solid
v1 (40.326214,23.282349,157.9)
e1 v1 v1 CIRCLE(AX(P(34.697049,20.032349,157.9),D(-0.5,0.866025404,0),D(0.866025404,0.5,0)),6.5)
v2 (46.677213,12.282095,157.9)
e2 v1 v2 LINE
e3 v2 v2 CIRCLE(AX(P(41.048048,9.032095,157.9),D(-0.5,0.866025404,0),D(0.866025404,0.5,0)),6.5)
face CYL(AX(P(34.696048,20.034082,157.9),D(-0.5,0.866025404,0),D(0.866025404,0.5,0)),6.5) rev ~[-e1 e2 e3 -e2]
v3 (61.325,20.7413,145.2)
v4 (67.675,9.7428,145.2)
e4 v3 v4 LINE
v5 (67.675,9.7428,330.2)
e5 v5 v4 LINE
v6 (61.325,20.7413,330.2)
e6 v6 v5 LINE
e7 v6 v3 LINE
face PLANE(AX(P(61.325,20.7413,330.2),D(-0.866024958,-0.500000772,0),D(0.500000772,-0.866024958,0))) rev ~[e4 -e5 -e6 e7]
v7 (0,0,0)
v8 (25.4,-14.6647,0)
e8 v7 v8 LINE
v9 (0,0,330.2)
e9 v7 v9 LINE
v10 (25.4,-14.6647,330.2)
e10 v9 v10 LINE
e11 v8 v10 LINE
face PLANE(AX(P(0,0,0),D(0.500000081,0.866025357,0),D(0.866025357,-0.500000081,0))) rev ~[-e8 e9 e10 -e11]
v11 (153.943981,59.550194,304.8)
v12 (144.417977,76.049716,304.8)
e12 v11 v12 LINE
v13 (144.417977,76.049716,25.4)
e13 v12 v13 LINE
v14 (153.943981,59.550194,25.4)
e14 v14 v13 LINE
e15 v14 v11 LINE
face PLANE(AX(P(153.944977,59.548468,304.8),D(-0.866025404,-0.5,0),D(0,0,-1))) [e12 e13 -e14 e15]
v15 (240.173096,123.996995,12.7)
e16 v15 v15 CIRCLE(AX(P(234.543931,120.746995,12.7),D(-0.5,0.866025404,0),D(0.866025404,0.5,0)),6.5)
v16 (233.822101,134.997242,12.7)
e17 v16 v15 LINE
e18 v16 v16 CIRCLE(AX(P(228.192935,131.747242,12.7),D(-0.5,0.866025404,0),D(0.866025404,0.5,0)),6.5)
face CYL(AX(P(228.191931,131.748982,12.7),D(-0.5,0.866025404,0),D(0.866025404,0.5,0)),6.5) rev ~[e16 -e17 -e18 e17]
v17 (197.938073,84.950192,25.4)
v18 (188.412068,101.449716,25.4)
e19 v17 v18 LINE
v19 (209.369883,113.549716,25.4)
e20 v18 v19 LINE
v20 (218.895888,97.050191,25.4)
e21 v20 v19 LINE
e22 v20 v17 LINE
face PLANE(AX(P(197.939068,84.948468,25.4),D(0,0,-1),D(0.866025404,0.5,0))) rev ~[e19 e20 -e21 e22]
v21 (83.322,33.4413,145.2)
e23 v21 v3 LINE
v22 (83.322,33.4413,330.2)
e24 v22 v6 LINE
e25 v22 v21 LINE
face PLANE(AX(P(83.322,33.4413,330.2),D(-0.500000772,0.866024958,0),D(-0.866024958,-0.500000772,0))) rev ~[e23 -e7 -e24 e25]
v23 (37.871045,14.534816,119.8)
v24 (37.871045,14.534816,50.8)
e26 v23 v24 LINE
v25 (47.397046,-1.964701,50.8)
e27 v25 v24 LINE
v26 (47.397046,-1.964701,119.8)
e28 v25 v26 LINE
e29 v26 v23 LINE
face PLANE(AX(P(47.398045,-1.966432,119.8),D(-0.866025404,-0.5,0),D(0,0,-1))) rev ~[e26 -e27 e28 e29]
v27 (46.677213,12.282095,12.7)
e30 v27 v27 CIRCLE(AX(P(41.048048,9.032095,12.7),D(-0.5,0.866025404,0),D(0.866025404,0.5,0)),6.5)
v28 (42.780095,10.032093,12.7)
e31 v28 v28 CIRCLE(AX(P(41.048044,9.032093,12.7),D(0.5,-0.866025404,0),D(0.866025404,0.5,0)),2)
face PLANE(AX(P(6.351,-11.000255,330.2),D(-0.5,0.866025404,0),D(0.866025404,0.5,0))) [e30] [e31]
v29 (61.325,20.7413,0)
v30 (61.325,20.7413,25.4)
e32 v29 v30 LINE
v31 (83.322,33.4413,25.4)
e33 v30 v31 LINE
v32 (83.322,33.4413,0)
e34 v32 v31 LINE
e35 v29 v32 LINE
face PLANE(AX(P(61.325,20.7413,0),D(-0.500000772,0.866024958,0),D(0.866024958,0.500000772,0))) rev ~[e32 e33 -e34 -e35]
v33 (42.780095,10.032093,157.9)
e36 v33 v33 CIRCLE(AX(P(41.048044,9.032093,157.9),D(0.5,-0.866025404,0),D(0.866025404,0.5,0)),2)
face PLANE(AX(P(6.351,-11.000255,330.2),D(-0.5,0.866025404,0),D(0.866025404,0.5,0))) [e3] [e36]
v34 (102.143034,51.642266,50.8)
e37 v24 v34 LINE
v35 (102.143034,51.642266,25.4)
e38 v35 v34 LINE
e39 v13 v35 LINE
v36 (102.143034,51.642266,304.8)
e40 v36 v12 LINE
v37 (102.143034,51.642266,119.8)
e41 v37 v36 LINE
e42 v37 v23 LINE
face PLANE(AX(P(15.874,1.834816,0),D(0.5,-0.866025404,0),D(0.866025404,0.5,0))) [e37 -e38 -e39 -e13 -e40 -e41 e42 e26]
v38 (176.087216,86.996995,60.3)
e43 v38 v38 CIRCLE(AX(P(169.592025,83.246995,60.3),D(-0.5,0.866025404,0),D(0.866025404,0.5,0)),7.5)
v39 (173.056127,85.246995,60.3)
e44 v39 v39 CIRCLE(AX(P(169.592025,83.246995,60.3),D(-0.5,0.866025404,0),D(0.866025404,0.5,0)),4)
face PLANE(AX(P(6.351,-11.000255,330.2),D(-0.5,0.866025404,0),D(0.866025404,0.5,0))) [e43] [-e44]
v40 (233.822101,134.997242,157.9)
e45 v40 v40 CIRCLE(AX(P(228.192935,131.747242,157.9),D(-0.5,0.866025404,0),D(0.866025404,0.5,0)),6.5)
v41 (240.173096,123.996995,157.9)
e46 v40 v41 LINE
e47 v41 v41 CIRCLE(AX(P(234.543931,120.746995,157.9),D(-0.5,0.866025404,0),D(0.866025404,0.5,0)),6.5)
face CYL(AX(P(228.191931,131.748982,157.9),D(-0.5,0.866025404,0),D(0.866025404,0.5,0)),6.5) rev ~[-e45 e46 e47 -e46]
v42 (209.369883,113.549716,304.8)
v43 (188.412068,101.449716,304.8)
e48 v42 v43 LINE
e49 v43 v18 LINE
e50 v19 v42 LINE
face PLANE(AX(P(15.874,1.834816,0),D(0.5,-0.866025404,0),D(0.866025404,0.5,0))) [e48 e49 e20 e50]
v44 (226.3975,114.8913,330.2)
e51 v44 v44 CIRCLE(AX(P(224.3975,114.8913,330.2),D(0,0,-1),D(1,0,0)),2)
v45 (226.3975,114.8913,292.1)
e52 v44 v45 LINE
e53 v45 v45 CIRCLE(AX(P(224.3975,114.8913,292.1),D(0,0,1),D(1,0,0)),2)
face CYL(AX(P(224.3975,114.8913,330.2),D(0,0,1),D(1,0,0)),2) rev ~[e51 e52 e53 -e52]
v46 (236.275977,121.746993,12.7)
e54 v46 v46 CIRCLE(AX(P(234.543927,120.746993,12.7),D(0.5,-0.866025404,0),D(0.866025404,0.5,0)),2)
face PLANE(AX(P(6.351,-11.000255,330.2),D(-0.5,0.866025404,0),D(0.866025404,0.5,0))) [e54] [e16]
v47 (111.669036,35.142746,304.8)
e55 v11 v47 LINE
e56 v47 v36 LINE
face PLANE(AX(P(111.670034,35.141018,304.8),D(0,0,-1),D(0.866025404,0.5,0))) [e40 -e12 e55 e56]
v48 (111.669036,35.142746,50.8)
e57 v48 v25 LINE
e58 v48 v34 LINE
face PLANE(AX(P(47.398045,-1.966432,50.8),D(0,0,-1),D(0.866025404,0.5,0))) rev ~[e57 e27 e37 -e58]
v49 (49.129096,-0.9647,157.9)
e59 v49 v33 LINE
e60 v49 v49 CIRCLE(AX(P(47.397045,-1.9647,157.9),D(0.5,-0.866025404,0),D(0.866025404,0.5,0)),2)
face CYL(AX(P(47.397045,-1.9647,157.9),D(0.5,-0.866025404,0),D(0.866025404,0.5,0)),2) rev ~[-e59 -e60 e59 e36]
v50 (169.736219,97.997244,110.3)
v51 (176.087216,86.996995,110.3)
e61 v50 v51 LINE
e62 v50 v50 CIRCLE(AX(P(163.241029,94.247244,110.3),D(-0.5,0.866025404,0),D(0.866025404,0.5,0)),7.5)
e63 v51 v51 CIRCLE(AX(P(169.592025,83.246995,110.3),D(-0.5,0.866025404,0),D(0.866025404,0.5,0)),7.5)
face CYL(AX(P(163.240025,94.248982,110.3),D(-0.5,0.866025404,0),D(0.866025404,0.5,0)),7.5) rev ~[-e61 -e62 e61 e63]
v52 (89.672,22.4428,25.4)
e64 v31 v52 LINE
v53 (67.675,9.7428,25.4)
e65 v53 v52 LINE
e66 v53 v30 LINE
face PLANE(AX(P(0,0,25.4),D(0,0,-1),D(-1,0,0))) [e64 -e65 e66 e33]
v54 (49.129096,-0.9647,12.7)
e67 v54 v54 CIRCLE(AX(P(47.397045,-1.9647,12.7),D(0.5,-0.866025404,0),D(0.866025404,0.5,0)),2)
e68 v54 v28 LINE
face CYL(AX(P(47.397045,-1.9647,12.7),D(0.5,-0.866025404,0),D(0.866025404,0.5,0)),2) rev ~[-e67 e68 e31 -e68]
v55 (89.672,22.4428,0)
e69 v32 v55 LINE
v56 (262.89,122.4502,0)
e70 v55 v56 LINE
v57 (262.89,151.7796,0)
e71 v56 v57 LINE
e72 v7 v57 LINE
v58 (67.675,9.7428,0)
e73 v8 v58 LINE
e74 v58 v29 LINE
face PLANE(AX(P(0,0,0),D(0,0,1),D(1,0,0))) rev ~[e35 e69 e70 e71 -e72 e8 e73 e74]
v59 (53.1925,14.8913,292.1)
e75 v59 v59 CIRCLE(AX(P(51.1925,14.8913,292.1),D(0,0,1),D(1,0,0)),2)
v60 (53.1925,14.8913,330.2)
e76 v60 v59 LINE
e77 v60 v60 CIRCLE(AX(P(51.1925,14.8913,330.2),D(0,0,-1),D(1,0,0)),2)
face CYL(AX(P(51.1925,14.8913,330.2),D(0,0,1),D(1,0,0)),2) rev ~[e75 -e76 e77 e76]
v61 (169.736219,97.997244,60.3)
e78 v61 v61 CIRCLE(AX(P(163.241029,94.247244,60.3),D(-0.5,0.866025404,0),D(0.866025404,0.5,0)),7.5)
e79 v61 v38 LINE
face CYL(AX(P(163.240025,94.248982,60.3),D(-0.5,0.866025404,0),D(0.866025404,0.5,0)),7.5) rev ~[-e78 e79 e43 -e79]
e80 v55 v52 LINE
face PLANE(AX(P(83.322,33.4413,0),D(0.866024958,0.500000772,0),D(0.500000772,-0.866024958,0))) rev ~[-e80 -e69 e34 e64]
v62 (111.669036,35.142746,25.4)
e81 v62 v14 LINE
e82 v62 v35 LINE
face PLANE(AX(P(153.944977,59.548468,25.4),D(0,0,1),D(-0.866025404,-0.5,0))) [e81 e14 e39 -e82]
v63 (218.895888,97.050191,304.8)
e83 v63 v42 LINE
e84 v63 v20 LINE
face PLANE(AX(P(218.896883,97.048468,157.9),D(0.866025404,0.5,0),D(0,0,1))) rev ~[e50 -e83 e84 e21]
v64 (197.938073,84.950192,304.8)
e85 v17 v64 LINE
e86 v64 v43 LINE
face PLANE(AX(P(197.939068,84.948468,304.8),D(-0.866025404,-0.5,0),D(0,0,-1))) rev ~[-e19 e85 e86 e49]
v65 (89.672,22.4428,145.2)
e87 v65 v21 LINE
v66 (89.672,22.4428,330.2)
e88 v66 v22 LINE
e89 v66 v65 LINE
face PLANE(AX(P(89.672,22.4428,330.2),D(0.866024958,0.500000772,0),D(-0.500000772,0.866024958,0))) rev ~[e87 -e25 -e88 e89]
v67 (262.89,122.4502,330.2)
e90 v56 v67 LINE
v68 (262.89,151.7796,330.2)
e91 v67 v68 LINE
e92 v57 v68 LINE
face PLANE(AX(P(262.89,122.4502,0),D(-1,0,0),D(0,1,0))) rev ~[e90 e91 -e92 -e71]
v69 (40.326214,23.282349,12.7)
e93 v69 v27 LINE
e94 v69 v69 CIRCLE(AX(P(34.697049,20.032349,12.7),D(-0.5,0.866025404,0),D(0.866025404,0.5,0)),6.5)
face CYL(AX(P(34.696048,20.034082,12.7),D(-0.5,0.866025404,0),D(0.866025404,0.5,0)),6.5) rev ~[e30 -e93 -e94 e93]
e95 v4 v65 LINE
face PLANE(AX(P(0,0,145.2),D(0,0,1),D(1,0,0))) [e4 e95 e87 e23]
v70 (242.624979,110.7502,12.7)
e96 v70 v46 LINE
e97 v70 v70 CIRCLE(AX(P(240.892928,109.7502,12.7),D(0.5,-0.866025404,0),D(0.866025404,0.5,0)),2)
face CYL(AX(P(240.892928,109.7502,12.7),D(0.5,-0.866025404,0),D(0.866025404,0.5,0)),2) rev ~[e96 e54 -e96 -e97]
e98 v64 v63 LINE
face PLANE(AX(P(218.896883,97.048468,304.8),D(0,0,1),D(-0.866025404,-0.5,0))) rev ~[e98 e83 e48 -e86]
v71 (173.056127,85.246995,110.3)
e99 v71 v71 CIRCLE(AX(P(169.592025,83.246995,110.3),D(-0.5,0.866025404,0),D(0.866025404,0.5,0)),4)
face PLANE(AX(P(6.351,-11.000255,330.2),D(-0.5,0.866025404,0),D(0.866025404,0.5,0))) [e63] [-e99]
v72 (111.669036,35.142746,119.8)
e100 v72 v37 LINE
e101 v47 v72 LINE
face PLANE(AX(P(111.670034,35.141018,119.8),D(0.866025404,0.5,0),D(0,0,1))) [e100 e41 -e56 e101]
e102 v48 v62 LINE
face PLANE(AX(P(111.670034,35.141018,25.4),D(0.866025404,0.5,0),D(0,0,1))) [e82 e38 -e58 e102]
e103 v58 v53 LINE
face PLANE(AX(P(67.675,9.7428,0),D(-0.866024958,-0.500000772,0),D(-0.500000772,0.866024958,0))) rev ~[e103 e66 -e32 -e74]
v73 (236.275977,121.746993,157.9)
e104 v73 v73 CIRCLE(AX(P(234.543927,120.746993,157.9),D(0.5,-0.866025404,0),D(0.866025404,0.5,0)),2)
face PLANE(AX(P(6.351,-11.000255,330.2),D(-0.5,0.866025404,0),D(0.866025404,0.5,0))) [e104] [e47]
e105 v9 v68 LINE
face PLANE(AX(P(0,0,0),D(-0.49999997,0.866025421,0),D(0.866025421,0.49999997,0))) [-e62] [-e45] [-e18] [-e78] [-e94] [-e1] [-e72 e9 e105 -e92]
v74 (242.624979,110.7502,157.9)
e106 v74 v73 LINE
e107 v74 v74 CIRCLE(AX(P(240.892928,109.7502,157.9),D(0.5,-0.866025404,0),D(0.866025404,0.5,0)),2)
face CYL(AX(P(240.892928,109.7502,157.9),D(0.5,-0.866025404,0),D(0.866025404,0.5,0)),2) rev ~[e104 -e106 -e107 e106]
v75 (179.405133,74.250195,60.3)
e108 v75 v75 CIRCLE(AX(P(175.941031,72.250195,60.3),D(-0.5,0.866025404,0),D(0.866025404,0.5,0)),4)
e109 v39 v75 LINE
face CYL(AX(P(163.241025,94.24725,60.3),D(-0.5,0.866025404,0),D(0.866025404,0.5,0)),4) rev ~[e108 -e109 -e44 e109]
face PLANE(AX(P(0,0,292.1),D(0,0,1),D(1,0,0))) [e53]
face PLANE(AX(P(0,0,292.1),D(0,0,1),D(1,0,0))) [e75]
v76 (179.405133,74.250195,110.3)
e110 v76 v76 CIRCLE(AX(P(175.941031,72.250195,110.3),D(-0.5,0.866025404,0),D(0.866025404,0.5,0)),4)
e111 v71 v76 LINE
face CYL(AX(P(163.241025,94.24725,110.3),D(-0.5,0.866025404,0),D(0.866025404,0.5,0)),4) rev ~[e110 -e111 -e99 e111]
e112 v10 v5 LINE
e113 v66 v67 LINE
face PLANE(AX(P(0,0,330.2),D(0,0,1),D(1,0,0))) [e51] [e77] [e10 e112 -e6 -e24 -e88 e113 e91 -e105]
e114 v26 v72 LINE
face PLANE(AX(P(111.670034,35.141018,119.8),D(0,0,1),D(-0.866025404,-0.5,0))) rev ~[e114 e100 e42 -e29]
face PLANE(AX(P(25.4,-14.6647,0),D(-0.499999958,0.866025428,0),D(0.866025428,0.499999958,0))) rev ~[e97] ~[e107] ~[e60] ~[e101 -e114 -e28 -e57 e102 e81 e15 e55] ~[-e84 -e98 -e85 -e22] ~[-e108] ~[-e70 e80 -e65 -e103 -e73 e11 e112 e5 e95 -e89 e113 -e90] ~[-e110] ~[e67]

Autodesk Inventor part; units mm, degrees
ref_plane "YZ Plane" through (0, 0, 0) normal (1, 0, 0) x (0, 1, 0)
ref_plane "XZ Plane" through (0, 0, 0) normal (0, 1, 0) x (-1, 0, 0)
ref_plane "XY Plane" through (0, 0, 0) normal (0, 0, 1) x (1, 0, 0)
sketch "Sketch1" plane through (0, 0, 0) normal (0, 0, 1) x (1, 0, 0)
  line L0 (262.89, 151.7796) -> (525.78, 0) construction
  line L1 (525.78, 0) -> (525.78, -303.5592) construction
  line L2 (525.78, -303.5592) -> (262.89, -455.3388) construction
  line L3 (262.89, -455.3388) -> (0, -303.5592) construction
  line L4 (0, -303.5592) -> (0, 0) construction
  line L5 (0, 0) -> (262.89, 151.7796)
  line L6 (0, 0) -> (25.4, -14.6647)
  line L7 (25.4, -14.6647) -> (262.89, 122.4502)
  line L8 (262.89, 122.4502) -> (262.89, 151.7796)
  point P0 (262.89, -151.7796)
  dimension "d0" = 525.78
  dimension "d2" = 25.4
  dimension "d3" = 60
  dimension "d4" = 60
extrude "Extrusion1" add sketch "Sketch1" along normal blind 330.2
sketch "Sketch8" plane through (0, 0, 0) normal (0, 0, -1) x (-1, 0, 0)
  line L0 (-25.4, -14.6647) -> (-262.89, 122.4502) projected
  line L1 (-67.675, 9.7428) -> (-61.325, 20.7413)
  line L2 (-61.325, 20.7413) -> (-83.322, 33.4413)
  line L3 (-83.322, 33.4413) -> (-89.672, 22.4428)
  line L4 (-67.675, 9.7428) -> (-89.672, 22.4428)
  point P0 (0, 0)
  dimension "d47" = 25.4
  dimension "d48" = 12.7
  dimension "d54" = 48.8149
extrude "Extrusion7" cut sketch "Sketch8" against normal blind 25.4
sketch "Sketch9" plane through (0, 0, 330.2) normal (0, 0, 1) x (1, 0, 0)
  line L0 (61.325, 20.7413) -> (67.675, 9.7428) projected
  line L1 (83.322, 33.4413) -> (61.325, 20.7413) projected
  line L2 (89.672, 22.4428) -> (83.322, 33.4413) projected
  line L3 (67.675, 9.7428) -> (89.672, 22.4428) projected
  point P0 (0, 0)
extrude "Extrusion8" cut sketch "Sketch9" against normal blind 185
sketch "Sketch10" plane through (25.4, -14.6647, 0) normal (0.5, -0.8660254, 0) x (0.8660254, 0.5, 0)
  circle A0 centre (25.4, 157.9) radius 2
  circle A1 centre (248.8298, 157.9) radius 2
  line L0 (25.4, 157.9) -> (248.8298, 157.9) construction
  line L1 (288.8945, 330.2) -> (-14.6647, 330.2) projected
  circle A2 centre (25.4, 12.7) radius 2
  circle A3 centre (248.8298, 12.7) radius 2
  line L2 (0, 0) -> (0, 330.2) projected
  line L3 (74.2149, 145.2) -> (48.8149, 145.2) projected
  line L4 (48.8149, 25.4) -> (74.2149, 25.4) projected
  point P0 (-14.6647, 0)
  point P1 (137.1149, 157.9)
  point P2 (137.1149, 330.2)
  dimension "d55" = 4
  dimension "d56" = 4
  dimension "d58" = 4
  dimension "d59" = 4
  dimension "d69" = 25.4
  dimension "d70" = 12.7
  dimension "d71" = 12.7
extrude "Extrusion9" cut sketch "Sketch10" against normal through all
sketch "Sketch11" plane through (0, 0, 330.2) normal (-0.5, 0.8660254, 0) x (0.8660254, 0.5, 0)
  circle A0 centre (263.4945, 172.3) radius 2 projected
  circle A1 centre (40.0647, 172.3) radius 2 projected
  circle A2 centre (40.0647, 317.5) radius 2 projected
  circle A3 centre (263.4945, 317.5) radius 2 projected
  circle A4 centre (263.4945, 172.3) radius 2 projected
  circle A5 centre (263.4945, 172.3) radius 6.5
  circle A6 centre (40.0647, 172.3) radius 6.5
  circle A7 centre (40.0647, 317.5) radius 6.5
  circle A8 centre (263.4945, 317.5) radius 2 projected
  circle A9 centre (263.4945, 317.5) radius 6.5
  point P0 (0, 330.2)
  dimension "d63" = 13
  dimension "d64" = 13
  dimension "d65" = 13
  dimension "d66" = 13
extrude "Extrusion10" cut sketch "Sketch11" against normal blind 12.7 contours A0 | A1 | A2 | A3 | A5 | A6 | A7 | A9
sketch "Sketch12" plane through (0, 0, 330.2) normal (-0.5, 0.8660254, 0) x (0.8660254, 0.5, 0)
  line L0 (288.8945, 330.2) -> (288.8945, 0) construction
  circle A0 centre (188.4945, 269.9) radius 4
  circle A1 centre (188.4945, 219.9) radius 4
  line L1 (88.8796, 330.2) -> (288.8945, 330.2) construction
  line L2 (213.8945, 330.2) -> (163.0945, 330.2) construction
  line L3 (163.0945, 330.2) -> (163.0945, 159.6) construction
  line L4 (163.0945, 159.6) -> (213.8945, 159.6) construction
  line L5 (213.8945, 159.6) -> (213.8945, 330.2) construction
  line L6 (188.4945, 269.9) -> (188.4945, 219.9) construction
  circle A2 centre (263.4945, 172.3) radius 2 construction
  circle A3 centre (263.4945, 317.5) radius 2 construction
  circle A4 centre (263.4945, 172.3) radius 2 construction
  line L7 (263.4945, 172.3) -> (263.4945, 317.5) construction
  point P0 (0, 330.2)
  point P1 (188.4945, 159.6)
  point P2 (188.4945, 244.9)
  point P3 (263.4945, 244.9)
  point P4 (213.8945, 244.9)
  dimension "d72" = 8
  dimension "d73" = 8
  dimension "d74" = 50
  dimension "d75" = 50.8
  dimension "d76" = 75
extrude "Extrusion11" cut sketch "Sketch12" against normal through all
sketch "Sketch13" plane through (25.4, -14.6647, 0) normal (0.5, -0.8660254, 0) x (0.8660254, 0.5, 0)
  line L0 (99.6149, 304.8) -> (148.4298, 304.8)
  line L1 (148.4298, 304.8) -> (148.4298, 25.4)
  line L2 (148.4298, 25.4) -> (99.6149, 25.4)
  line L3 (99.6149, 25.4) -> (99.6149, 304.8)
  line L4 (199.2298, 25.4) -> (223.4298, 25.4)
  line L5 (223.4298, 25.4) -> (223.4298, 304.8)
  line L6 (223.4298, 304.8) -> (199.2298, 304.8)
  line L7 (199.2298, 304.8) -> (199.2298, 25.4)
  line L8 (288.8945, 330.2) -> (-14.6647, 330.2) projected
  line L9 (288.8945, 0) -> (-14.6647, 0) projected
  line L10 (148.4298, 110.3) -> (199.2298, 110.3) construction
  circle A0 centre (173.8298, 110.3) radius 4 projected
  line L11 (223.4298, 157.9) -> (274.2298, 157.9)
  line L12 (274.2298, 0) -> (274.2298, 330.2) projected
  circle A1 centre (248.8298, 157.9) radius 2 projected
  line L13 (74.2149, 330.2) -> (74.2149, 145.2) projected
  line L14 (99.6149, 119.8) -> (25.4, 119.8)
  line L15 (25.4, 119.8) -> (25.4, 50.8)
  line L16 (25.4, 50.8) -> (99.6149, 50.8)
  line L17 (99.6149, 50.8) -> (99.6149, 119.8)
  line L18 (74.2149, 145.2) -> (48.8149, 145.2) projected
  line L19 (48.8149, 25.4) -> (74.2149, 25.4) projected
  line L20 (0, 0) -> (0, 330.2) projected
  dimension "d79" = 25.4
  dimension "d80" = 25.4
  dimension "d81" = 25.4
  dimension "d82" = 25.4
  dimension "d83" = 25.4
  dimension "d84" = 25.4
  dimension "d85" = 25.4
extrude "Extrusion12" cut sketch "Sketch13" against normal blind 19.05 contours L0 L1 L2 L3 | L3 L16 L15 L14 | L7 L6 L5 L4
sketch "Sketch14" plane through (0, 0, 330.2) normal (-0.5, 0.8660254, 0) x (0.8660254, 0.5, 0)
  circle A0 centre (188.4945, 219.9) radius 4 projected
  circle A1 centre (188.4945, 269.9) radius 4 projected
  circle A2 centre (188.4945, 219.9) radius 7.5
  circle A3 centre (188.4945, 269.9) radius 4 projected
  circle A4 centre (188.4945, 269.9) radius 7.5
  point P0 (0, 330.2)
  dimension "d88" = 15
  dimension "d89" = 15
extrude "Extrusion13" cut sketch "Sketch14" against normal blind 12.7 contours A0 | A1 | A2 | A4
sketch "Sketch15" plane through (0, 0, 330.2) normal (0, 0, 1) x (1, 0, 0)
  line L0 (0, 0) -> (25.4, -14.6647) projected
  line L1 (12.7, -7.3323) -> (262.89, 137.1149) construction
  line L2 (262.89, 122.4502) -> (262.89, 151.7796) projected
  line L3 (51.1925, 14.8913) -> (224.3975, 114.8913)
  circle A0 centre (51.1925, 14.8913) radius 2
  circle A1 centre (224.3975, 114.8913) radius 2
  point P0 (137.795, 64.8913)
  dimension "d92" = 200
  dimension "d93" = 4
  dimension "d94" = 4
extrude "Extrusion14" cut sketch "Sketch15" against normal blind 38.1
properties part number "HB02" material "Polyethylene, High Density"
